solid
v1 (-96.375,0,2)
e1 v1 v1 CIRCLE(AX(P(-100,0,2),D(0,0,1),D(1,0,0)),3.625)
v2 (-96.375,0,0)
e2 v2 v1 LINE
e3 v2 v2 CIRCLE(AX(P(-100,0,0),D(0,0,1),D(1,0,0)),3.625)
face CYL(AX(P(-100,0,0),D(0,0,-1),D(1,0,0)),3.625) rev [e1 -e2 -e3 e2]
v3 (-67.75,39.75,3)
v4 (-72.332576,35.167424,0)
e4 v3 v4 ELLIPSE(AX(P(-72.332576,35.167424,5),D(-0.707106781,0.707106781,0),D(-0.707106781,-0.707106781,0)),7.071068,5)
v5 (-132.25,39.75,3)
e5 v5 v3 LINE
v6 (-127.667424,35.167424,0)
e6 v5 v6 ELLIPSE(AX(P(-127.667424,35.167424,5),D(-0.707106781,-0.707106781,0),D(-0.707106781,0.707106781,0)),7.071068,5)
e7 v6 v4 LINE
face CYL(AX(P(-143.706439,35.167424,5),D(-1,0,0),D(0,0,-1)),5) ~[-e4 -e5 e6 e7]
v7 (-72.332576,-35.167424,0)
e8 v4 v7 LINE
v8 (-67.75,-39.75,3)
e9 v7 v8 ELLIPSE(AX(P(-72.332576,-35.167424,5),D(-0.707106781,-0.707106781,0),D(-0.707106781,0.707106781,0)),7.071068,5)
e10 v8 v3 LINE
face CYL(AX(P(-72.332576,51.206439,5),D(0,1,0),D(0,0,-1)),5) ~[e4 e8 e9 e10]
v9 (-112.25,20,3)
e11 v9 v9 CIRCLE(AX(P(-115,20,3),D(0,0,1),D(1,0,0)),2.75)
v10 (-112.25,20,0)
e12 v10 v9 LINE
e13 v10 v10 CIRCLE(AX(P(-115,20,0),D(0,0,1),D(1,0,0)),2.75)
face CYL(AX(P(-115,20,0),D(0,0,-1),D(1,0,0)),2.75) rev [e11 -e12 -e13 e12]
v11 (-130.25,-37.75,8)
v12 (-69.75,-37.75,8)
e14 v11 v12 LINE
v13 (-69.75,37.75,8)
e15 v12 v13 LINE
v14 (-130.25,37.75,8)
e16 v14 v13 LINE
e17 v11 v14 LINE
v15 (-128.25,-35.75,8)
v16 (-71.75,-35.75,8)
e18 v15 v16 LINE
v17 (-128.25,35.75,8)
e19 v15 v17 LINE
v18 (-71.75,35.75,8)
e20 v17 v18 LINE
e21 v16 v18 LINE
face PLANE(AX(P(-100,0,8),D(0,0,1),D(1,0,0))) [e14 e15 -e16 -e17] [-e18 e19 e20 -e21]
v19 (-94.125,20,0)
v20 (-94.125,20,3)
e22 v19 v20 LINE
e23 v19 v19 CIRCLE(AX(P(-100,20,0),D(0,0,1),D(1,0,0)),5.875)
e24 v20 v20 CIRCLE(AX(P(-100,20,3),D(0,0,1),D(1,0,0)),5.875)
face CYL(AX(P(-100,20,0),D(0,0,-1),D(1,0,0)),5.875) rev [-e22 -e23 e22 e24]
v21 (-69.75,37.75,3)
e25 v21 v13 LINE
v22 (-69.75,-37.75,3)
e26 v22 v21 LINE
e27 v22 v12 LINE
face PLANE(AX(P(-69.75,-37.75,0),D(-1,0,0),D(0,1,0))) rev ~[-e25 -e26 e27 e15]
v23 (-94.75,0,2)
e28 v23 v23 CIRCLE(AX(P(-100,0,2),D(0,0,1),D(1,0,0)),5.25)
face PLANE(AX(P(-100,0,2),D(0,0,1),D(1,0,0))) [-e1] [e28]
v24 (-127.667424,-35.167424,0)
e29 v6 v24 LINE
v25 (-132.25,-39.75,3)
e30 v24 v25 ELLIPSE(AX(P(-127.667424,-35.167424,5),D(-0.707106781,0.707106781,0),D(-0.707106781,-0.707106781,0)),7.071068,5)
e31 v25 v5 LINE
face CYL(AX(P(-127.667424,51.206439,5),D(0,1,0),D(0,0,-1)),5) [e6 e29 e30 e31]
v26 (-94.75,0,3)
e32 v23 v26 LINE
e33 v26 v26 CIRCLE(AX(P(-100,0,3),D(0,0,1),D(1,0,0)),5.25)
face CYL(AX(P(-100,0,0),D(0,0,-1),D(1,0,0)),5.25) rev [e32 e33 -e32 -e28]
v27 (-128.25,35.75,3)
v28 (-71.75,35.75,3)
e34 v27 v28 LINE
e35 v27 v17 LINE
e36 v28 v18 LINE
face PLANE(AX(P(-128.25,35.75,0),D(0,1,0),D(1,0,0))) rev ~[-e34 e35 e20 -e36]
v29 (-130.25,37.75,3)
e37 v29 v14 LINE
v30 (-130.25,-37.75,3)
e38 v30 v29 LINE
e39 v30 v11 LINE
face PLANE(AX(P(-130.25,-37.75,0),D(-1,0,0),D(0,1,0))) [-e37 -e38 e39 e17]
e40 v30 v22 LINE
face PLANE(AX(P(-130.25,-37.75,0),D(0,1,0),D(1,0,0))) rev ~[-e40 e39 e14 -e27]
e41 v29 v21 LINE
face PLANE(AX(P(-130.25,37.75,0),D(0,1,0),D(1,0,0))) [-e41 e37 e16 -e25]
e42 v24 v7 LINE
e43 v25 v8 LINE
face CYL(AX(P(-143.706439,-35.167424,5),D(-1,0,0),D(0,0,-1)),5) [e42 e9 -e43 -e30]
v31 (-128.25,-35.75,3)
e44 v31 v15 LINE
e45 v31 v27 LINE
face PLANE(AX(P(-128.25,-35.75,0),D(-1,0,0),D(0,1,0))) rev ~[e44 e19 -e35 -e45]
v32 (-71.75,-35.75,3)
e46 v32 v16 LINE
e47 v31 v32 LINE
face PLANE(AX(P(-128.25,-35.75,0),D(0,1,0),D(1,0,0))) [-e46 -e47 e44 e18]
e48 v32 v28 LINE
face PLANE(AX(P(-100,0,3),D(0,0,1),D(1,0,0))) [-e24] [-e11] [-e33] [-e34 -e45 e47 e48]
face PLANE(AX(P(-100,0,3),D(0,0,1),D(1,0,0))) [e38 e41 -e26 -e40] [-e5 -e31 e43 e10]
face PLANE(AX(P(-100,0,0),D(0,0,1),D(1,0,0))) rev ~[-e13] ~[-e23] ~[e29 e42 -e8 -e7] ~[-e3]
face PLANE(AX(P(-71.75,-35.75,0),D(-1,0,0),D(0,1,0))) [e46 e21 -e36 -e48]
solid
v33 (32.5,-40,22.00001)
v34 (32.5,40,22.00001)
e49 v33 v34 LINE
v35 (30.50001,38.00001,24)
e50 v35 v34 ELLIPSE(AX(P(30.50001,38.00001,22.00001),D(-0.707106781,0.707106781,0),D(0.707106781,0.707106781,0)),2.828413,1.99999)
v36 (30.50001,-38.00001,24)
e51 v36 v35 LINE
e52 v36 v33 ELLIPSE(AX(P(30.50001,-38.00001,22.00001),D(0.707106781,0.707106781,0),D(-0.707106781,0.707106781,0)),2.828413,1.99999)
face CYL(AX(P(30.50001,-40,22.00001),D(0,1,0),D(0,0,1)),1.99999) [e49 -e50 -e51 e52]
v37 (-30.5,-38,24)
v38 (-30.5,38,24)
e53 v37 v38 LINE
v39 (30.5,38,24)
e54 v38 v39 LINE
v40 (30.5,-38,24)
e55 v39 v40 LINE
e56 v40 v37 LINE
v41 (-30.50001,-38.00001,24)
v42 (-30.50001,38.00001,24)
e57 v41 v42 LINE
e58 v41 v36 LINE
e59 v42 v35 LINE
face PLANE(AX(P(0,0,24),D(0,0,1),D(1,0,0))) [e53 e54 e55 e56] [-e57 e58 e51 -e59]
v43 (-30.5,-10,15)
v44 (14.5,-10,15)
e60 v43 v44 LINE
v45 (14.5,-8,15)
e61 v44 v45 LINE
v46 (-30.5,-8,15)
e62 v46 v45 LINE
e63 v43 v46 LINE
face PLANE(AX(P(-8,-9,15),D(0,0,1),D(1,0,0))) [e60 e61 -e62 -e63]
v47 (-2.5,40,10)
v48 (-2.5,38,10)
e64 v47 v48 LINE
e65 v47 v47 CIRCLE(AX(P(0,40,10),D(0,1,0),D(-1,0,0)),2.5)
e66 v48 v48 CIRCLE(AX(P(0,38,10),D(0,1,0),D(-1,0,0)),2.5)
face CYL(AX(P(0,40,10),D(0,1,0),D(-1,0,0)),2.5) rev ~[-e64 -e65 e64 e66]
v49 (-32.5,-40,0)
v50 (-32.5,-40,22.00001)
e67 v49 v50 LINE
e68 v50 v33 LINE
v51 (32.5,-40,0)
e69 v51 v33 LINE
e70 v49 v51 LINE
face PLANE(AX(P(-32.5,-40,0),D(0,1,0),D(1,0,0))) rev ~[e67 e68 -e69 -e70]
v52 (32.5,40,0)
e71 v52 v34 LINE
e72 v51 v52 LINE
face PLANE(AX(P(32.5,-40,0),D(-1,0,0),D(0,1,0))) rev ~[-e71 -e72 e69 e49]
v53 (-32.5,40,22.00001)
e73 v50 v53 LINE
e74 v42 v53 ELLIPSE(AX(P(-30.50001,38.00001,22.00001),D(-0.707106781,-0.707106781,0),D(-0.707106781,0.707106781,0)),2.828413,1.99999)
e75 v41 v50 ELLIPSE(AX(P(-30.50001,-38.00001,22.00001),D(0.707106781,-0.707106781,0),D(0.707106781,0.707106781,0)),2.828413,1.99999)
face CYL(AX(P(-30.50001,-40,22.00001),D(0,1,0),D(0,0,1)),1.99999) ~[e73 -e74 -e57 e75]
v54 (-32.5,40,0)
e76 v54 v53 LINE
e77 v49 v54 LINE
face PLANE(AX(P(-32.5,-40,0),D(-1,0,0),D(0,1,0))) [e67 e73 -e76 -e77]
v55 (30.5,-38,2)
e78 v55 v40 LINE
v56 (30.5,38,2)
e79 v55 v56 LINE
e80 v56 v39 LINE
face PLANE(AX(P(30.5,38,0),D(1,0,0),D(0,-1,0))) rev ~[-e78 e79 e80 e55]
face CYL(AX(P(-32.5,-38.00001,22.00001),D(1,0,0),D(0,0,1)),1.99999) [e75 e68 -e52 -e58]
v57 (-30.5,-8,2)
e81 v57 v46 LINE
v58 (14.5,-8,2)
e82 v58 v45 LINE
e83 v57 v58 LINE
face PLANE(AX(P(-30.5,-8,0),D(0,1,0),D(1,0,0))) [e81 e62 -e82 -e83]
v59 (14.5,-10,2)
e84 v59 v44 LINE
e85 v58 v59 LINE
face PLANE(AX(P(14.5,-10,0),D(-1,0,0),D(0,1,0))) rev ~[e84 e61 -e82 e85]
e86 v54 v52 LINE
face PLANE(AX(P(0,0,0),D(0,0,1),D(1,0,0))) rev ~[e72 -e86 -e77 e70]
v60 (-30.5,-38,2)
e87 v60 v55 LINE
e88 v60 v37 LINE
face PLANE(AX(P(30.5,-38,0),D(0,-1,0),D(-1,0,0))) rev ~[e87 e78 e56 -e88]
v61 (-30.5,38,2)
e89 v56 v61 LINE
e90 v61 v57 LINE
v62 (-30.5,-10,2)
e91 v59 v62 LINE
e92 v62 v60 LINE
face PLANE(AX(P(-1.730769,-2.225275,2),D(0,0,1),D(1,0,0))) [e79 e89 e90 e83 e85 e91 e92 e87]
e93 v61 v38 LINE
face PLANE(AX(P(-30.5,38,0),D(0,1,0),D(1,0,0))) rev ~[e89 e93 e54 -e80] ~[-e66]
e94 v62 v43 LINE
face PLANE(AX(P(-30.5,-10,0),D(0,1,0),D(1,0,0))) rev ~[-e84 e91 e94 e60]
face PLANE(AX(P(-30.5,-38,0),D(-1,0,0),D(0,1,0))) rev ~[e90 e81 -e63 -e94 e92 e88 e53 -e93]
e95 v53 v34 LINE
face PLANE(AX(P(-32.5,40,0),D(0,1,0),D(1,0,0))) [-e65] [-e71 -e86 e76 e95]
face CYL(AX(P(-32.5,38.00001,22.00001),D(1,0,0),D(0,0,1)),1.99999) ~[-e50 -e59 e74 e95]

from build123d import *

# Parameters (mm, degrees)
F1_DEPTH     = 2
F0_W         = 65
F0_H         = 80
F2_DEPTH     = 24
F0_W_2       = 45
F0_H_2       = 2
F3_DEPTH     = 15
F4_R         = 2.5
F5_DEPTH     = 2
F6_R         = 1.99999
F0_W_3       = 64.5
F0_H_3       = 79.5
F0_W_4       = 60.5
F0_H_4       = 75.5
F7_DEPTH     = 3
F0_W_5       = 56.5
F0_H_5       = 71.5
F0_R         = 5.25
F0_R_2       = 2.75
F0_R_3       = 5.875
F8_DEPTH     = 8
F0_R_4       = 3.625
F9_DEPTH     = 2
F10_T1_DEPTH = 87.4128784748
F10_T3_DEPTH = 102.4128784748


# Not quite as in the source:
# - a fillet or chamfer that OpenCascade refuses, or shapes differently, is made with other operations: its cross-section is extruded or revolved along the edge and cut away or added
# - a fillet or chamfer is up to 0.001 mm smaller than in the source, because OpenCascade refuses the exact size


with BuildPart() as f1:
    # F0 (on Top) → F1 (new body)
    with BuildSketch(Plane.XY):
        Polygon((30.5, 38), (-30.5, 38), (-30.5, -8), (14.5, -8), (14.5, -10), (-30.5, -10), (-30.5, -38), (30.5, -38), align=None)
    extrude(amount=F1_DEPTH)

    # F0 (on Top) → F2 (join)
    with BuildSketch(Plane.XY):
        Rectangle(F0_W, F0_H)
        Polygon((-30.5, -8), (-30.5, 38), (30.5, 38), (30.5, -38), (-30.5, -38), (-30.5, -10), align=None, mode=Mode.SUBTRACT)
    extrude(amount=F2_DEPTH)

    # F0 (on Top) → F3 (join)
    with BuildSketch(Plane.XY):
        with Locations((-8, -9)):
            Rectangle(F0_W_2, F0_H_2)
    extrude(amount=F3_DEPTH)

    # F4 (on face) → F5 (cut, through all)
    with BuildSketch(Plane(origin=(0, 40, 0), x_dir=(-1, 0, 0), z_dir=(0, 1, 0))):
        with Locations((0, 10)):
            Circle(F4_R)
    extrude(amount=-F5_DEPTH, mode=Mode.SUBTRACT)

    # F6 (radius 2 in the source; OpenCascade refuses exactly that, so slightly less here)
    f6_edges = [f1.edges().sort_by_distance(p)[0] for p in [
        (-32.5, 0, 24),
        (0, 40, 24),
        (32.5, 0, 24),
        (0, -40, 24),
    ]]
    fillet(f6_edges, radius=F6_R)


with BuildPart() as f7:
    # F0 (on Top) → F7 (new body)
    with BuildSketch(Plane.XY):
        with Locations((-100, 0)):
            Rectangle(F0_W_3, F0_H_3)
        with Locations((-100, 0)):
            Rectangle(F0_W_4, F0_H_4, mode=Mode.SUBTRACT)
    extrude(amount=F7_DEPTH)



with BuildPart() as f7b:
    # F0 (on Top) → F7, piece 2 (new body)
    with BuildSketch(Plane.XY):
        with Locations((-100, 0)):
            Rectangle(F0_W_5, F0_H_5)
        with Locations((-100, 0)):
            Circle(F0_R, mode=Mode.SUBTRACT)
        with Locations((-115, 20)):
            Circle(F0_R_2, mode=Mode.SUBTRACT)
        with Locations((-100, 20)):
            Circle(F0_R_3, mode=Mode.SUBTRACT)
    extrude(amount=F7_DEPTH)


with BuildPart() as f7_1:
    add(f7.part)

    add(f7b.part)  # F8 merges F7b
    # F0 (on Top) → F8 (join)
    with BuildSketch(Plane.XY):
        with Locations((-100, 0)):
            Rectangle(F0_W_4, F0_H_4)
        with Locations((-100, 0)):
            Rectangle(F0_W_5, F0_H_5, mode=Mode.SUBTRACT)
    extrude(amount=F8_DEPTH)

    # F0 (on Top) → F9 (join)
    with BuildSketch(Plane.XY):
        with Locations((-100, 0)):
            Circle(F0_R)
        with Locations((-100, 0)):
            Circle(F0_R_4, mode=Mode.SUBTRACT)
    extrude(amount=F9_DEPTH)

    # F10: fillet of radius 5 on 4 edges, made by hand

    # F10_s2 → F10_t1 (cut)
    with BuildSketch(Plane.YZ.offset(-143.7064392374)):
        with BuildLine():
            ThreePointArc((35.167424305, 0), (37.9060370926, 0.8166998673), (39.75, 3))
            Line((39.75, 3), (39.75, 0))
            Line((39.75, 0), (35.167424305, 0))
        make_face()
        with BuildLine():
            ThreePointArc((-35.167424305, 0), (-37.9060370926, 0.8166998673), (-39.75, 3))
            Line((-39.75, 3), (-39.75, 0))
            Line((-39.75, 0), (-35.167424305, 0))
        make_face()
    extrude(amount=F10_T1_DEPTH, mode=Mode.SUBTRACT)

    # F10_s4 → F10_t3 (cut)
    with BuildSketch(Plane.XZ.offset(-51.2064392374)):
        with BuildLine():
            ThreePointArc((-127.667424305, 0), (-130.4060370926, 0.8166998673), (-132.25, 3))
            Line((-132.25, 3), (-132.25, 0))
            Line((-132.25, 0), (-127.667424305, 0))
        make_face()
        with BuildLine():
            ThreePointArc((-72.332575695, 0), (-69.5939629074, 0.8166998673), (-67.75, 3))
            Line((-67.75, 3), (-67.75, 0))
            Line((-67.75, 0), (-72.332575695, 0))
        make_face()
    extrude(amount=F10_T3_DEPTH, mode=Mode.SUBTRACT)


solid = Compound([f1.part, f7_1.part])
